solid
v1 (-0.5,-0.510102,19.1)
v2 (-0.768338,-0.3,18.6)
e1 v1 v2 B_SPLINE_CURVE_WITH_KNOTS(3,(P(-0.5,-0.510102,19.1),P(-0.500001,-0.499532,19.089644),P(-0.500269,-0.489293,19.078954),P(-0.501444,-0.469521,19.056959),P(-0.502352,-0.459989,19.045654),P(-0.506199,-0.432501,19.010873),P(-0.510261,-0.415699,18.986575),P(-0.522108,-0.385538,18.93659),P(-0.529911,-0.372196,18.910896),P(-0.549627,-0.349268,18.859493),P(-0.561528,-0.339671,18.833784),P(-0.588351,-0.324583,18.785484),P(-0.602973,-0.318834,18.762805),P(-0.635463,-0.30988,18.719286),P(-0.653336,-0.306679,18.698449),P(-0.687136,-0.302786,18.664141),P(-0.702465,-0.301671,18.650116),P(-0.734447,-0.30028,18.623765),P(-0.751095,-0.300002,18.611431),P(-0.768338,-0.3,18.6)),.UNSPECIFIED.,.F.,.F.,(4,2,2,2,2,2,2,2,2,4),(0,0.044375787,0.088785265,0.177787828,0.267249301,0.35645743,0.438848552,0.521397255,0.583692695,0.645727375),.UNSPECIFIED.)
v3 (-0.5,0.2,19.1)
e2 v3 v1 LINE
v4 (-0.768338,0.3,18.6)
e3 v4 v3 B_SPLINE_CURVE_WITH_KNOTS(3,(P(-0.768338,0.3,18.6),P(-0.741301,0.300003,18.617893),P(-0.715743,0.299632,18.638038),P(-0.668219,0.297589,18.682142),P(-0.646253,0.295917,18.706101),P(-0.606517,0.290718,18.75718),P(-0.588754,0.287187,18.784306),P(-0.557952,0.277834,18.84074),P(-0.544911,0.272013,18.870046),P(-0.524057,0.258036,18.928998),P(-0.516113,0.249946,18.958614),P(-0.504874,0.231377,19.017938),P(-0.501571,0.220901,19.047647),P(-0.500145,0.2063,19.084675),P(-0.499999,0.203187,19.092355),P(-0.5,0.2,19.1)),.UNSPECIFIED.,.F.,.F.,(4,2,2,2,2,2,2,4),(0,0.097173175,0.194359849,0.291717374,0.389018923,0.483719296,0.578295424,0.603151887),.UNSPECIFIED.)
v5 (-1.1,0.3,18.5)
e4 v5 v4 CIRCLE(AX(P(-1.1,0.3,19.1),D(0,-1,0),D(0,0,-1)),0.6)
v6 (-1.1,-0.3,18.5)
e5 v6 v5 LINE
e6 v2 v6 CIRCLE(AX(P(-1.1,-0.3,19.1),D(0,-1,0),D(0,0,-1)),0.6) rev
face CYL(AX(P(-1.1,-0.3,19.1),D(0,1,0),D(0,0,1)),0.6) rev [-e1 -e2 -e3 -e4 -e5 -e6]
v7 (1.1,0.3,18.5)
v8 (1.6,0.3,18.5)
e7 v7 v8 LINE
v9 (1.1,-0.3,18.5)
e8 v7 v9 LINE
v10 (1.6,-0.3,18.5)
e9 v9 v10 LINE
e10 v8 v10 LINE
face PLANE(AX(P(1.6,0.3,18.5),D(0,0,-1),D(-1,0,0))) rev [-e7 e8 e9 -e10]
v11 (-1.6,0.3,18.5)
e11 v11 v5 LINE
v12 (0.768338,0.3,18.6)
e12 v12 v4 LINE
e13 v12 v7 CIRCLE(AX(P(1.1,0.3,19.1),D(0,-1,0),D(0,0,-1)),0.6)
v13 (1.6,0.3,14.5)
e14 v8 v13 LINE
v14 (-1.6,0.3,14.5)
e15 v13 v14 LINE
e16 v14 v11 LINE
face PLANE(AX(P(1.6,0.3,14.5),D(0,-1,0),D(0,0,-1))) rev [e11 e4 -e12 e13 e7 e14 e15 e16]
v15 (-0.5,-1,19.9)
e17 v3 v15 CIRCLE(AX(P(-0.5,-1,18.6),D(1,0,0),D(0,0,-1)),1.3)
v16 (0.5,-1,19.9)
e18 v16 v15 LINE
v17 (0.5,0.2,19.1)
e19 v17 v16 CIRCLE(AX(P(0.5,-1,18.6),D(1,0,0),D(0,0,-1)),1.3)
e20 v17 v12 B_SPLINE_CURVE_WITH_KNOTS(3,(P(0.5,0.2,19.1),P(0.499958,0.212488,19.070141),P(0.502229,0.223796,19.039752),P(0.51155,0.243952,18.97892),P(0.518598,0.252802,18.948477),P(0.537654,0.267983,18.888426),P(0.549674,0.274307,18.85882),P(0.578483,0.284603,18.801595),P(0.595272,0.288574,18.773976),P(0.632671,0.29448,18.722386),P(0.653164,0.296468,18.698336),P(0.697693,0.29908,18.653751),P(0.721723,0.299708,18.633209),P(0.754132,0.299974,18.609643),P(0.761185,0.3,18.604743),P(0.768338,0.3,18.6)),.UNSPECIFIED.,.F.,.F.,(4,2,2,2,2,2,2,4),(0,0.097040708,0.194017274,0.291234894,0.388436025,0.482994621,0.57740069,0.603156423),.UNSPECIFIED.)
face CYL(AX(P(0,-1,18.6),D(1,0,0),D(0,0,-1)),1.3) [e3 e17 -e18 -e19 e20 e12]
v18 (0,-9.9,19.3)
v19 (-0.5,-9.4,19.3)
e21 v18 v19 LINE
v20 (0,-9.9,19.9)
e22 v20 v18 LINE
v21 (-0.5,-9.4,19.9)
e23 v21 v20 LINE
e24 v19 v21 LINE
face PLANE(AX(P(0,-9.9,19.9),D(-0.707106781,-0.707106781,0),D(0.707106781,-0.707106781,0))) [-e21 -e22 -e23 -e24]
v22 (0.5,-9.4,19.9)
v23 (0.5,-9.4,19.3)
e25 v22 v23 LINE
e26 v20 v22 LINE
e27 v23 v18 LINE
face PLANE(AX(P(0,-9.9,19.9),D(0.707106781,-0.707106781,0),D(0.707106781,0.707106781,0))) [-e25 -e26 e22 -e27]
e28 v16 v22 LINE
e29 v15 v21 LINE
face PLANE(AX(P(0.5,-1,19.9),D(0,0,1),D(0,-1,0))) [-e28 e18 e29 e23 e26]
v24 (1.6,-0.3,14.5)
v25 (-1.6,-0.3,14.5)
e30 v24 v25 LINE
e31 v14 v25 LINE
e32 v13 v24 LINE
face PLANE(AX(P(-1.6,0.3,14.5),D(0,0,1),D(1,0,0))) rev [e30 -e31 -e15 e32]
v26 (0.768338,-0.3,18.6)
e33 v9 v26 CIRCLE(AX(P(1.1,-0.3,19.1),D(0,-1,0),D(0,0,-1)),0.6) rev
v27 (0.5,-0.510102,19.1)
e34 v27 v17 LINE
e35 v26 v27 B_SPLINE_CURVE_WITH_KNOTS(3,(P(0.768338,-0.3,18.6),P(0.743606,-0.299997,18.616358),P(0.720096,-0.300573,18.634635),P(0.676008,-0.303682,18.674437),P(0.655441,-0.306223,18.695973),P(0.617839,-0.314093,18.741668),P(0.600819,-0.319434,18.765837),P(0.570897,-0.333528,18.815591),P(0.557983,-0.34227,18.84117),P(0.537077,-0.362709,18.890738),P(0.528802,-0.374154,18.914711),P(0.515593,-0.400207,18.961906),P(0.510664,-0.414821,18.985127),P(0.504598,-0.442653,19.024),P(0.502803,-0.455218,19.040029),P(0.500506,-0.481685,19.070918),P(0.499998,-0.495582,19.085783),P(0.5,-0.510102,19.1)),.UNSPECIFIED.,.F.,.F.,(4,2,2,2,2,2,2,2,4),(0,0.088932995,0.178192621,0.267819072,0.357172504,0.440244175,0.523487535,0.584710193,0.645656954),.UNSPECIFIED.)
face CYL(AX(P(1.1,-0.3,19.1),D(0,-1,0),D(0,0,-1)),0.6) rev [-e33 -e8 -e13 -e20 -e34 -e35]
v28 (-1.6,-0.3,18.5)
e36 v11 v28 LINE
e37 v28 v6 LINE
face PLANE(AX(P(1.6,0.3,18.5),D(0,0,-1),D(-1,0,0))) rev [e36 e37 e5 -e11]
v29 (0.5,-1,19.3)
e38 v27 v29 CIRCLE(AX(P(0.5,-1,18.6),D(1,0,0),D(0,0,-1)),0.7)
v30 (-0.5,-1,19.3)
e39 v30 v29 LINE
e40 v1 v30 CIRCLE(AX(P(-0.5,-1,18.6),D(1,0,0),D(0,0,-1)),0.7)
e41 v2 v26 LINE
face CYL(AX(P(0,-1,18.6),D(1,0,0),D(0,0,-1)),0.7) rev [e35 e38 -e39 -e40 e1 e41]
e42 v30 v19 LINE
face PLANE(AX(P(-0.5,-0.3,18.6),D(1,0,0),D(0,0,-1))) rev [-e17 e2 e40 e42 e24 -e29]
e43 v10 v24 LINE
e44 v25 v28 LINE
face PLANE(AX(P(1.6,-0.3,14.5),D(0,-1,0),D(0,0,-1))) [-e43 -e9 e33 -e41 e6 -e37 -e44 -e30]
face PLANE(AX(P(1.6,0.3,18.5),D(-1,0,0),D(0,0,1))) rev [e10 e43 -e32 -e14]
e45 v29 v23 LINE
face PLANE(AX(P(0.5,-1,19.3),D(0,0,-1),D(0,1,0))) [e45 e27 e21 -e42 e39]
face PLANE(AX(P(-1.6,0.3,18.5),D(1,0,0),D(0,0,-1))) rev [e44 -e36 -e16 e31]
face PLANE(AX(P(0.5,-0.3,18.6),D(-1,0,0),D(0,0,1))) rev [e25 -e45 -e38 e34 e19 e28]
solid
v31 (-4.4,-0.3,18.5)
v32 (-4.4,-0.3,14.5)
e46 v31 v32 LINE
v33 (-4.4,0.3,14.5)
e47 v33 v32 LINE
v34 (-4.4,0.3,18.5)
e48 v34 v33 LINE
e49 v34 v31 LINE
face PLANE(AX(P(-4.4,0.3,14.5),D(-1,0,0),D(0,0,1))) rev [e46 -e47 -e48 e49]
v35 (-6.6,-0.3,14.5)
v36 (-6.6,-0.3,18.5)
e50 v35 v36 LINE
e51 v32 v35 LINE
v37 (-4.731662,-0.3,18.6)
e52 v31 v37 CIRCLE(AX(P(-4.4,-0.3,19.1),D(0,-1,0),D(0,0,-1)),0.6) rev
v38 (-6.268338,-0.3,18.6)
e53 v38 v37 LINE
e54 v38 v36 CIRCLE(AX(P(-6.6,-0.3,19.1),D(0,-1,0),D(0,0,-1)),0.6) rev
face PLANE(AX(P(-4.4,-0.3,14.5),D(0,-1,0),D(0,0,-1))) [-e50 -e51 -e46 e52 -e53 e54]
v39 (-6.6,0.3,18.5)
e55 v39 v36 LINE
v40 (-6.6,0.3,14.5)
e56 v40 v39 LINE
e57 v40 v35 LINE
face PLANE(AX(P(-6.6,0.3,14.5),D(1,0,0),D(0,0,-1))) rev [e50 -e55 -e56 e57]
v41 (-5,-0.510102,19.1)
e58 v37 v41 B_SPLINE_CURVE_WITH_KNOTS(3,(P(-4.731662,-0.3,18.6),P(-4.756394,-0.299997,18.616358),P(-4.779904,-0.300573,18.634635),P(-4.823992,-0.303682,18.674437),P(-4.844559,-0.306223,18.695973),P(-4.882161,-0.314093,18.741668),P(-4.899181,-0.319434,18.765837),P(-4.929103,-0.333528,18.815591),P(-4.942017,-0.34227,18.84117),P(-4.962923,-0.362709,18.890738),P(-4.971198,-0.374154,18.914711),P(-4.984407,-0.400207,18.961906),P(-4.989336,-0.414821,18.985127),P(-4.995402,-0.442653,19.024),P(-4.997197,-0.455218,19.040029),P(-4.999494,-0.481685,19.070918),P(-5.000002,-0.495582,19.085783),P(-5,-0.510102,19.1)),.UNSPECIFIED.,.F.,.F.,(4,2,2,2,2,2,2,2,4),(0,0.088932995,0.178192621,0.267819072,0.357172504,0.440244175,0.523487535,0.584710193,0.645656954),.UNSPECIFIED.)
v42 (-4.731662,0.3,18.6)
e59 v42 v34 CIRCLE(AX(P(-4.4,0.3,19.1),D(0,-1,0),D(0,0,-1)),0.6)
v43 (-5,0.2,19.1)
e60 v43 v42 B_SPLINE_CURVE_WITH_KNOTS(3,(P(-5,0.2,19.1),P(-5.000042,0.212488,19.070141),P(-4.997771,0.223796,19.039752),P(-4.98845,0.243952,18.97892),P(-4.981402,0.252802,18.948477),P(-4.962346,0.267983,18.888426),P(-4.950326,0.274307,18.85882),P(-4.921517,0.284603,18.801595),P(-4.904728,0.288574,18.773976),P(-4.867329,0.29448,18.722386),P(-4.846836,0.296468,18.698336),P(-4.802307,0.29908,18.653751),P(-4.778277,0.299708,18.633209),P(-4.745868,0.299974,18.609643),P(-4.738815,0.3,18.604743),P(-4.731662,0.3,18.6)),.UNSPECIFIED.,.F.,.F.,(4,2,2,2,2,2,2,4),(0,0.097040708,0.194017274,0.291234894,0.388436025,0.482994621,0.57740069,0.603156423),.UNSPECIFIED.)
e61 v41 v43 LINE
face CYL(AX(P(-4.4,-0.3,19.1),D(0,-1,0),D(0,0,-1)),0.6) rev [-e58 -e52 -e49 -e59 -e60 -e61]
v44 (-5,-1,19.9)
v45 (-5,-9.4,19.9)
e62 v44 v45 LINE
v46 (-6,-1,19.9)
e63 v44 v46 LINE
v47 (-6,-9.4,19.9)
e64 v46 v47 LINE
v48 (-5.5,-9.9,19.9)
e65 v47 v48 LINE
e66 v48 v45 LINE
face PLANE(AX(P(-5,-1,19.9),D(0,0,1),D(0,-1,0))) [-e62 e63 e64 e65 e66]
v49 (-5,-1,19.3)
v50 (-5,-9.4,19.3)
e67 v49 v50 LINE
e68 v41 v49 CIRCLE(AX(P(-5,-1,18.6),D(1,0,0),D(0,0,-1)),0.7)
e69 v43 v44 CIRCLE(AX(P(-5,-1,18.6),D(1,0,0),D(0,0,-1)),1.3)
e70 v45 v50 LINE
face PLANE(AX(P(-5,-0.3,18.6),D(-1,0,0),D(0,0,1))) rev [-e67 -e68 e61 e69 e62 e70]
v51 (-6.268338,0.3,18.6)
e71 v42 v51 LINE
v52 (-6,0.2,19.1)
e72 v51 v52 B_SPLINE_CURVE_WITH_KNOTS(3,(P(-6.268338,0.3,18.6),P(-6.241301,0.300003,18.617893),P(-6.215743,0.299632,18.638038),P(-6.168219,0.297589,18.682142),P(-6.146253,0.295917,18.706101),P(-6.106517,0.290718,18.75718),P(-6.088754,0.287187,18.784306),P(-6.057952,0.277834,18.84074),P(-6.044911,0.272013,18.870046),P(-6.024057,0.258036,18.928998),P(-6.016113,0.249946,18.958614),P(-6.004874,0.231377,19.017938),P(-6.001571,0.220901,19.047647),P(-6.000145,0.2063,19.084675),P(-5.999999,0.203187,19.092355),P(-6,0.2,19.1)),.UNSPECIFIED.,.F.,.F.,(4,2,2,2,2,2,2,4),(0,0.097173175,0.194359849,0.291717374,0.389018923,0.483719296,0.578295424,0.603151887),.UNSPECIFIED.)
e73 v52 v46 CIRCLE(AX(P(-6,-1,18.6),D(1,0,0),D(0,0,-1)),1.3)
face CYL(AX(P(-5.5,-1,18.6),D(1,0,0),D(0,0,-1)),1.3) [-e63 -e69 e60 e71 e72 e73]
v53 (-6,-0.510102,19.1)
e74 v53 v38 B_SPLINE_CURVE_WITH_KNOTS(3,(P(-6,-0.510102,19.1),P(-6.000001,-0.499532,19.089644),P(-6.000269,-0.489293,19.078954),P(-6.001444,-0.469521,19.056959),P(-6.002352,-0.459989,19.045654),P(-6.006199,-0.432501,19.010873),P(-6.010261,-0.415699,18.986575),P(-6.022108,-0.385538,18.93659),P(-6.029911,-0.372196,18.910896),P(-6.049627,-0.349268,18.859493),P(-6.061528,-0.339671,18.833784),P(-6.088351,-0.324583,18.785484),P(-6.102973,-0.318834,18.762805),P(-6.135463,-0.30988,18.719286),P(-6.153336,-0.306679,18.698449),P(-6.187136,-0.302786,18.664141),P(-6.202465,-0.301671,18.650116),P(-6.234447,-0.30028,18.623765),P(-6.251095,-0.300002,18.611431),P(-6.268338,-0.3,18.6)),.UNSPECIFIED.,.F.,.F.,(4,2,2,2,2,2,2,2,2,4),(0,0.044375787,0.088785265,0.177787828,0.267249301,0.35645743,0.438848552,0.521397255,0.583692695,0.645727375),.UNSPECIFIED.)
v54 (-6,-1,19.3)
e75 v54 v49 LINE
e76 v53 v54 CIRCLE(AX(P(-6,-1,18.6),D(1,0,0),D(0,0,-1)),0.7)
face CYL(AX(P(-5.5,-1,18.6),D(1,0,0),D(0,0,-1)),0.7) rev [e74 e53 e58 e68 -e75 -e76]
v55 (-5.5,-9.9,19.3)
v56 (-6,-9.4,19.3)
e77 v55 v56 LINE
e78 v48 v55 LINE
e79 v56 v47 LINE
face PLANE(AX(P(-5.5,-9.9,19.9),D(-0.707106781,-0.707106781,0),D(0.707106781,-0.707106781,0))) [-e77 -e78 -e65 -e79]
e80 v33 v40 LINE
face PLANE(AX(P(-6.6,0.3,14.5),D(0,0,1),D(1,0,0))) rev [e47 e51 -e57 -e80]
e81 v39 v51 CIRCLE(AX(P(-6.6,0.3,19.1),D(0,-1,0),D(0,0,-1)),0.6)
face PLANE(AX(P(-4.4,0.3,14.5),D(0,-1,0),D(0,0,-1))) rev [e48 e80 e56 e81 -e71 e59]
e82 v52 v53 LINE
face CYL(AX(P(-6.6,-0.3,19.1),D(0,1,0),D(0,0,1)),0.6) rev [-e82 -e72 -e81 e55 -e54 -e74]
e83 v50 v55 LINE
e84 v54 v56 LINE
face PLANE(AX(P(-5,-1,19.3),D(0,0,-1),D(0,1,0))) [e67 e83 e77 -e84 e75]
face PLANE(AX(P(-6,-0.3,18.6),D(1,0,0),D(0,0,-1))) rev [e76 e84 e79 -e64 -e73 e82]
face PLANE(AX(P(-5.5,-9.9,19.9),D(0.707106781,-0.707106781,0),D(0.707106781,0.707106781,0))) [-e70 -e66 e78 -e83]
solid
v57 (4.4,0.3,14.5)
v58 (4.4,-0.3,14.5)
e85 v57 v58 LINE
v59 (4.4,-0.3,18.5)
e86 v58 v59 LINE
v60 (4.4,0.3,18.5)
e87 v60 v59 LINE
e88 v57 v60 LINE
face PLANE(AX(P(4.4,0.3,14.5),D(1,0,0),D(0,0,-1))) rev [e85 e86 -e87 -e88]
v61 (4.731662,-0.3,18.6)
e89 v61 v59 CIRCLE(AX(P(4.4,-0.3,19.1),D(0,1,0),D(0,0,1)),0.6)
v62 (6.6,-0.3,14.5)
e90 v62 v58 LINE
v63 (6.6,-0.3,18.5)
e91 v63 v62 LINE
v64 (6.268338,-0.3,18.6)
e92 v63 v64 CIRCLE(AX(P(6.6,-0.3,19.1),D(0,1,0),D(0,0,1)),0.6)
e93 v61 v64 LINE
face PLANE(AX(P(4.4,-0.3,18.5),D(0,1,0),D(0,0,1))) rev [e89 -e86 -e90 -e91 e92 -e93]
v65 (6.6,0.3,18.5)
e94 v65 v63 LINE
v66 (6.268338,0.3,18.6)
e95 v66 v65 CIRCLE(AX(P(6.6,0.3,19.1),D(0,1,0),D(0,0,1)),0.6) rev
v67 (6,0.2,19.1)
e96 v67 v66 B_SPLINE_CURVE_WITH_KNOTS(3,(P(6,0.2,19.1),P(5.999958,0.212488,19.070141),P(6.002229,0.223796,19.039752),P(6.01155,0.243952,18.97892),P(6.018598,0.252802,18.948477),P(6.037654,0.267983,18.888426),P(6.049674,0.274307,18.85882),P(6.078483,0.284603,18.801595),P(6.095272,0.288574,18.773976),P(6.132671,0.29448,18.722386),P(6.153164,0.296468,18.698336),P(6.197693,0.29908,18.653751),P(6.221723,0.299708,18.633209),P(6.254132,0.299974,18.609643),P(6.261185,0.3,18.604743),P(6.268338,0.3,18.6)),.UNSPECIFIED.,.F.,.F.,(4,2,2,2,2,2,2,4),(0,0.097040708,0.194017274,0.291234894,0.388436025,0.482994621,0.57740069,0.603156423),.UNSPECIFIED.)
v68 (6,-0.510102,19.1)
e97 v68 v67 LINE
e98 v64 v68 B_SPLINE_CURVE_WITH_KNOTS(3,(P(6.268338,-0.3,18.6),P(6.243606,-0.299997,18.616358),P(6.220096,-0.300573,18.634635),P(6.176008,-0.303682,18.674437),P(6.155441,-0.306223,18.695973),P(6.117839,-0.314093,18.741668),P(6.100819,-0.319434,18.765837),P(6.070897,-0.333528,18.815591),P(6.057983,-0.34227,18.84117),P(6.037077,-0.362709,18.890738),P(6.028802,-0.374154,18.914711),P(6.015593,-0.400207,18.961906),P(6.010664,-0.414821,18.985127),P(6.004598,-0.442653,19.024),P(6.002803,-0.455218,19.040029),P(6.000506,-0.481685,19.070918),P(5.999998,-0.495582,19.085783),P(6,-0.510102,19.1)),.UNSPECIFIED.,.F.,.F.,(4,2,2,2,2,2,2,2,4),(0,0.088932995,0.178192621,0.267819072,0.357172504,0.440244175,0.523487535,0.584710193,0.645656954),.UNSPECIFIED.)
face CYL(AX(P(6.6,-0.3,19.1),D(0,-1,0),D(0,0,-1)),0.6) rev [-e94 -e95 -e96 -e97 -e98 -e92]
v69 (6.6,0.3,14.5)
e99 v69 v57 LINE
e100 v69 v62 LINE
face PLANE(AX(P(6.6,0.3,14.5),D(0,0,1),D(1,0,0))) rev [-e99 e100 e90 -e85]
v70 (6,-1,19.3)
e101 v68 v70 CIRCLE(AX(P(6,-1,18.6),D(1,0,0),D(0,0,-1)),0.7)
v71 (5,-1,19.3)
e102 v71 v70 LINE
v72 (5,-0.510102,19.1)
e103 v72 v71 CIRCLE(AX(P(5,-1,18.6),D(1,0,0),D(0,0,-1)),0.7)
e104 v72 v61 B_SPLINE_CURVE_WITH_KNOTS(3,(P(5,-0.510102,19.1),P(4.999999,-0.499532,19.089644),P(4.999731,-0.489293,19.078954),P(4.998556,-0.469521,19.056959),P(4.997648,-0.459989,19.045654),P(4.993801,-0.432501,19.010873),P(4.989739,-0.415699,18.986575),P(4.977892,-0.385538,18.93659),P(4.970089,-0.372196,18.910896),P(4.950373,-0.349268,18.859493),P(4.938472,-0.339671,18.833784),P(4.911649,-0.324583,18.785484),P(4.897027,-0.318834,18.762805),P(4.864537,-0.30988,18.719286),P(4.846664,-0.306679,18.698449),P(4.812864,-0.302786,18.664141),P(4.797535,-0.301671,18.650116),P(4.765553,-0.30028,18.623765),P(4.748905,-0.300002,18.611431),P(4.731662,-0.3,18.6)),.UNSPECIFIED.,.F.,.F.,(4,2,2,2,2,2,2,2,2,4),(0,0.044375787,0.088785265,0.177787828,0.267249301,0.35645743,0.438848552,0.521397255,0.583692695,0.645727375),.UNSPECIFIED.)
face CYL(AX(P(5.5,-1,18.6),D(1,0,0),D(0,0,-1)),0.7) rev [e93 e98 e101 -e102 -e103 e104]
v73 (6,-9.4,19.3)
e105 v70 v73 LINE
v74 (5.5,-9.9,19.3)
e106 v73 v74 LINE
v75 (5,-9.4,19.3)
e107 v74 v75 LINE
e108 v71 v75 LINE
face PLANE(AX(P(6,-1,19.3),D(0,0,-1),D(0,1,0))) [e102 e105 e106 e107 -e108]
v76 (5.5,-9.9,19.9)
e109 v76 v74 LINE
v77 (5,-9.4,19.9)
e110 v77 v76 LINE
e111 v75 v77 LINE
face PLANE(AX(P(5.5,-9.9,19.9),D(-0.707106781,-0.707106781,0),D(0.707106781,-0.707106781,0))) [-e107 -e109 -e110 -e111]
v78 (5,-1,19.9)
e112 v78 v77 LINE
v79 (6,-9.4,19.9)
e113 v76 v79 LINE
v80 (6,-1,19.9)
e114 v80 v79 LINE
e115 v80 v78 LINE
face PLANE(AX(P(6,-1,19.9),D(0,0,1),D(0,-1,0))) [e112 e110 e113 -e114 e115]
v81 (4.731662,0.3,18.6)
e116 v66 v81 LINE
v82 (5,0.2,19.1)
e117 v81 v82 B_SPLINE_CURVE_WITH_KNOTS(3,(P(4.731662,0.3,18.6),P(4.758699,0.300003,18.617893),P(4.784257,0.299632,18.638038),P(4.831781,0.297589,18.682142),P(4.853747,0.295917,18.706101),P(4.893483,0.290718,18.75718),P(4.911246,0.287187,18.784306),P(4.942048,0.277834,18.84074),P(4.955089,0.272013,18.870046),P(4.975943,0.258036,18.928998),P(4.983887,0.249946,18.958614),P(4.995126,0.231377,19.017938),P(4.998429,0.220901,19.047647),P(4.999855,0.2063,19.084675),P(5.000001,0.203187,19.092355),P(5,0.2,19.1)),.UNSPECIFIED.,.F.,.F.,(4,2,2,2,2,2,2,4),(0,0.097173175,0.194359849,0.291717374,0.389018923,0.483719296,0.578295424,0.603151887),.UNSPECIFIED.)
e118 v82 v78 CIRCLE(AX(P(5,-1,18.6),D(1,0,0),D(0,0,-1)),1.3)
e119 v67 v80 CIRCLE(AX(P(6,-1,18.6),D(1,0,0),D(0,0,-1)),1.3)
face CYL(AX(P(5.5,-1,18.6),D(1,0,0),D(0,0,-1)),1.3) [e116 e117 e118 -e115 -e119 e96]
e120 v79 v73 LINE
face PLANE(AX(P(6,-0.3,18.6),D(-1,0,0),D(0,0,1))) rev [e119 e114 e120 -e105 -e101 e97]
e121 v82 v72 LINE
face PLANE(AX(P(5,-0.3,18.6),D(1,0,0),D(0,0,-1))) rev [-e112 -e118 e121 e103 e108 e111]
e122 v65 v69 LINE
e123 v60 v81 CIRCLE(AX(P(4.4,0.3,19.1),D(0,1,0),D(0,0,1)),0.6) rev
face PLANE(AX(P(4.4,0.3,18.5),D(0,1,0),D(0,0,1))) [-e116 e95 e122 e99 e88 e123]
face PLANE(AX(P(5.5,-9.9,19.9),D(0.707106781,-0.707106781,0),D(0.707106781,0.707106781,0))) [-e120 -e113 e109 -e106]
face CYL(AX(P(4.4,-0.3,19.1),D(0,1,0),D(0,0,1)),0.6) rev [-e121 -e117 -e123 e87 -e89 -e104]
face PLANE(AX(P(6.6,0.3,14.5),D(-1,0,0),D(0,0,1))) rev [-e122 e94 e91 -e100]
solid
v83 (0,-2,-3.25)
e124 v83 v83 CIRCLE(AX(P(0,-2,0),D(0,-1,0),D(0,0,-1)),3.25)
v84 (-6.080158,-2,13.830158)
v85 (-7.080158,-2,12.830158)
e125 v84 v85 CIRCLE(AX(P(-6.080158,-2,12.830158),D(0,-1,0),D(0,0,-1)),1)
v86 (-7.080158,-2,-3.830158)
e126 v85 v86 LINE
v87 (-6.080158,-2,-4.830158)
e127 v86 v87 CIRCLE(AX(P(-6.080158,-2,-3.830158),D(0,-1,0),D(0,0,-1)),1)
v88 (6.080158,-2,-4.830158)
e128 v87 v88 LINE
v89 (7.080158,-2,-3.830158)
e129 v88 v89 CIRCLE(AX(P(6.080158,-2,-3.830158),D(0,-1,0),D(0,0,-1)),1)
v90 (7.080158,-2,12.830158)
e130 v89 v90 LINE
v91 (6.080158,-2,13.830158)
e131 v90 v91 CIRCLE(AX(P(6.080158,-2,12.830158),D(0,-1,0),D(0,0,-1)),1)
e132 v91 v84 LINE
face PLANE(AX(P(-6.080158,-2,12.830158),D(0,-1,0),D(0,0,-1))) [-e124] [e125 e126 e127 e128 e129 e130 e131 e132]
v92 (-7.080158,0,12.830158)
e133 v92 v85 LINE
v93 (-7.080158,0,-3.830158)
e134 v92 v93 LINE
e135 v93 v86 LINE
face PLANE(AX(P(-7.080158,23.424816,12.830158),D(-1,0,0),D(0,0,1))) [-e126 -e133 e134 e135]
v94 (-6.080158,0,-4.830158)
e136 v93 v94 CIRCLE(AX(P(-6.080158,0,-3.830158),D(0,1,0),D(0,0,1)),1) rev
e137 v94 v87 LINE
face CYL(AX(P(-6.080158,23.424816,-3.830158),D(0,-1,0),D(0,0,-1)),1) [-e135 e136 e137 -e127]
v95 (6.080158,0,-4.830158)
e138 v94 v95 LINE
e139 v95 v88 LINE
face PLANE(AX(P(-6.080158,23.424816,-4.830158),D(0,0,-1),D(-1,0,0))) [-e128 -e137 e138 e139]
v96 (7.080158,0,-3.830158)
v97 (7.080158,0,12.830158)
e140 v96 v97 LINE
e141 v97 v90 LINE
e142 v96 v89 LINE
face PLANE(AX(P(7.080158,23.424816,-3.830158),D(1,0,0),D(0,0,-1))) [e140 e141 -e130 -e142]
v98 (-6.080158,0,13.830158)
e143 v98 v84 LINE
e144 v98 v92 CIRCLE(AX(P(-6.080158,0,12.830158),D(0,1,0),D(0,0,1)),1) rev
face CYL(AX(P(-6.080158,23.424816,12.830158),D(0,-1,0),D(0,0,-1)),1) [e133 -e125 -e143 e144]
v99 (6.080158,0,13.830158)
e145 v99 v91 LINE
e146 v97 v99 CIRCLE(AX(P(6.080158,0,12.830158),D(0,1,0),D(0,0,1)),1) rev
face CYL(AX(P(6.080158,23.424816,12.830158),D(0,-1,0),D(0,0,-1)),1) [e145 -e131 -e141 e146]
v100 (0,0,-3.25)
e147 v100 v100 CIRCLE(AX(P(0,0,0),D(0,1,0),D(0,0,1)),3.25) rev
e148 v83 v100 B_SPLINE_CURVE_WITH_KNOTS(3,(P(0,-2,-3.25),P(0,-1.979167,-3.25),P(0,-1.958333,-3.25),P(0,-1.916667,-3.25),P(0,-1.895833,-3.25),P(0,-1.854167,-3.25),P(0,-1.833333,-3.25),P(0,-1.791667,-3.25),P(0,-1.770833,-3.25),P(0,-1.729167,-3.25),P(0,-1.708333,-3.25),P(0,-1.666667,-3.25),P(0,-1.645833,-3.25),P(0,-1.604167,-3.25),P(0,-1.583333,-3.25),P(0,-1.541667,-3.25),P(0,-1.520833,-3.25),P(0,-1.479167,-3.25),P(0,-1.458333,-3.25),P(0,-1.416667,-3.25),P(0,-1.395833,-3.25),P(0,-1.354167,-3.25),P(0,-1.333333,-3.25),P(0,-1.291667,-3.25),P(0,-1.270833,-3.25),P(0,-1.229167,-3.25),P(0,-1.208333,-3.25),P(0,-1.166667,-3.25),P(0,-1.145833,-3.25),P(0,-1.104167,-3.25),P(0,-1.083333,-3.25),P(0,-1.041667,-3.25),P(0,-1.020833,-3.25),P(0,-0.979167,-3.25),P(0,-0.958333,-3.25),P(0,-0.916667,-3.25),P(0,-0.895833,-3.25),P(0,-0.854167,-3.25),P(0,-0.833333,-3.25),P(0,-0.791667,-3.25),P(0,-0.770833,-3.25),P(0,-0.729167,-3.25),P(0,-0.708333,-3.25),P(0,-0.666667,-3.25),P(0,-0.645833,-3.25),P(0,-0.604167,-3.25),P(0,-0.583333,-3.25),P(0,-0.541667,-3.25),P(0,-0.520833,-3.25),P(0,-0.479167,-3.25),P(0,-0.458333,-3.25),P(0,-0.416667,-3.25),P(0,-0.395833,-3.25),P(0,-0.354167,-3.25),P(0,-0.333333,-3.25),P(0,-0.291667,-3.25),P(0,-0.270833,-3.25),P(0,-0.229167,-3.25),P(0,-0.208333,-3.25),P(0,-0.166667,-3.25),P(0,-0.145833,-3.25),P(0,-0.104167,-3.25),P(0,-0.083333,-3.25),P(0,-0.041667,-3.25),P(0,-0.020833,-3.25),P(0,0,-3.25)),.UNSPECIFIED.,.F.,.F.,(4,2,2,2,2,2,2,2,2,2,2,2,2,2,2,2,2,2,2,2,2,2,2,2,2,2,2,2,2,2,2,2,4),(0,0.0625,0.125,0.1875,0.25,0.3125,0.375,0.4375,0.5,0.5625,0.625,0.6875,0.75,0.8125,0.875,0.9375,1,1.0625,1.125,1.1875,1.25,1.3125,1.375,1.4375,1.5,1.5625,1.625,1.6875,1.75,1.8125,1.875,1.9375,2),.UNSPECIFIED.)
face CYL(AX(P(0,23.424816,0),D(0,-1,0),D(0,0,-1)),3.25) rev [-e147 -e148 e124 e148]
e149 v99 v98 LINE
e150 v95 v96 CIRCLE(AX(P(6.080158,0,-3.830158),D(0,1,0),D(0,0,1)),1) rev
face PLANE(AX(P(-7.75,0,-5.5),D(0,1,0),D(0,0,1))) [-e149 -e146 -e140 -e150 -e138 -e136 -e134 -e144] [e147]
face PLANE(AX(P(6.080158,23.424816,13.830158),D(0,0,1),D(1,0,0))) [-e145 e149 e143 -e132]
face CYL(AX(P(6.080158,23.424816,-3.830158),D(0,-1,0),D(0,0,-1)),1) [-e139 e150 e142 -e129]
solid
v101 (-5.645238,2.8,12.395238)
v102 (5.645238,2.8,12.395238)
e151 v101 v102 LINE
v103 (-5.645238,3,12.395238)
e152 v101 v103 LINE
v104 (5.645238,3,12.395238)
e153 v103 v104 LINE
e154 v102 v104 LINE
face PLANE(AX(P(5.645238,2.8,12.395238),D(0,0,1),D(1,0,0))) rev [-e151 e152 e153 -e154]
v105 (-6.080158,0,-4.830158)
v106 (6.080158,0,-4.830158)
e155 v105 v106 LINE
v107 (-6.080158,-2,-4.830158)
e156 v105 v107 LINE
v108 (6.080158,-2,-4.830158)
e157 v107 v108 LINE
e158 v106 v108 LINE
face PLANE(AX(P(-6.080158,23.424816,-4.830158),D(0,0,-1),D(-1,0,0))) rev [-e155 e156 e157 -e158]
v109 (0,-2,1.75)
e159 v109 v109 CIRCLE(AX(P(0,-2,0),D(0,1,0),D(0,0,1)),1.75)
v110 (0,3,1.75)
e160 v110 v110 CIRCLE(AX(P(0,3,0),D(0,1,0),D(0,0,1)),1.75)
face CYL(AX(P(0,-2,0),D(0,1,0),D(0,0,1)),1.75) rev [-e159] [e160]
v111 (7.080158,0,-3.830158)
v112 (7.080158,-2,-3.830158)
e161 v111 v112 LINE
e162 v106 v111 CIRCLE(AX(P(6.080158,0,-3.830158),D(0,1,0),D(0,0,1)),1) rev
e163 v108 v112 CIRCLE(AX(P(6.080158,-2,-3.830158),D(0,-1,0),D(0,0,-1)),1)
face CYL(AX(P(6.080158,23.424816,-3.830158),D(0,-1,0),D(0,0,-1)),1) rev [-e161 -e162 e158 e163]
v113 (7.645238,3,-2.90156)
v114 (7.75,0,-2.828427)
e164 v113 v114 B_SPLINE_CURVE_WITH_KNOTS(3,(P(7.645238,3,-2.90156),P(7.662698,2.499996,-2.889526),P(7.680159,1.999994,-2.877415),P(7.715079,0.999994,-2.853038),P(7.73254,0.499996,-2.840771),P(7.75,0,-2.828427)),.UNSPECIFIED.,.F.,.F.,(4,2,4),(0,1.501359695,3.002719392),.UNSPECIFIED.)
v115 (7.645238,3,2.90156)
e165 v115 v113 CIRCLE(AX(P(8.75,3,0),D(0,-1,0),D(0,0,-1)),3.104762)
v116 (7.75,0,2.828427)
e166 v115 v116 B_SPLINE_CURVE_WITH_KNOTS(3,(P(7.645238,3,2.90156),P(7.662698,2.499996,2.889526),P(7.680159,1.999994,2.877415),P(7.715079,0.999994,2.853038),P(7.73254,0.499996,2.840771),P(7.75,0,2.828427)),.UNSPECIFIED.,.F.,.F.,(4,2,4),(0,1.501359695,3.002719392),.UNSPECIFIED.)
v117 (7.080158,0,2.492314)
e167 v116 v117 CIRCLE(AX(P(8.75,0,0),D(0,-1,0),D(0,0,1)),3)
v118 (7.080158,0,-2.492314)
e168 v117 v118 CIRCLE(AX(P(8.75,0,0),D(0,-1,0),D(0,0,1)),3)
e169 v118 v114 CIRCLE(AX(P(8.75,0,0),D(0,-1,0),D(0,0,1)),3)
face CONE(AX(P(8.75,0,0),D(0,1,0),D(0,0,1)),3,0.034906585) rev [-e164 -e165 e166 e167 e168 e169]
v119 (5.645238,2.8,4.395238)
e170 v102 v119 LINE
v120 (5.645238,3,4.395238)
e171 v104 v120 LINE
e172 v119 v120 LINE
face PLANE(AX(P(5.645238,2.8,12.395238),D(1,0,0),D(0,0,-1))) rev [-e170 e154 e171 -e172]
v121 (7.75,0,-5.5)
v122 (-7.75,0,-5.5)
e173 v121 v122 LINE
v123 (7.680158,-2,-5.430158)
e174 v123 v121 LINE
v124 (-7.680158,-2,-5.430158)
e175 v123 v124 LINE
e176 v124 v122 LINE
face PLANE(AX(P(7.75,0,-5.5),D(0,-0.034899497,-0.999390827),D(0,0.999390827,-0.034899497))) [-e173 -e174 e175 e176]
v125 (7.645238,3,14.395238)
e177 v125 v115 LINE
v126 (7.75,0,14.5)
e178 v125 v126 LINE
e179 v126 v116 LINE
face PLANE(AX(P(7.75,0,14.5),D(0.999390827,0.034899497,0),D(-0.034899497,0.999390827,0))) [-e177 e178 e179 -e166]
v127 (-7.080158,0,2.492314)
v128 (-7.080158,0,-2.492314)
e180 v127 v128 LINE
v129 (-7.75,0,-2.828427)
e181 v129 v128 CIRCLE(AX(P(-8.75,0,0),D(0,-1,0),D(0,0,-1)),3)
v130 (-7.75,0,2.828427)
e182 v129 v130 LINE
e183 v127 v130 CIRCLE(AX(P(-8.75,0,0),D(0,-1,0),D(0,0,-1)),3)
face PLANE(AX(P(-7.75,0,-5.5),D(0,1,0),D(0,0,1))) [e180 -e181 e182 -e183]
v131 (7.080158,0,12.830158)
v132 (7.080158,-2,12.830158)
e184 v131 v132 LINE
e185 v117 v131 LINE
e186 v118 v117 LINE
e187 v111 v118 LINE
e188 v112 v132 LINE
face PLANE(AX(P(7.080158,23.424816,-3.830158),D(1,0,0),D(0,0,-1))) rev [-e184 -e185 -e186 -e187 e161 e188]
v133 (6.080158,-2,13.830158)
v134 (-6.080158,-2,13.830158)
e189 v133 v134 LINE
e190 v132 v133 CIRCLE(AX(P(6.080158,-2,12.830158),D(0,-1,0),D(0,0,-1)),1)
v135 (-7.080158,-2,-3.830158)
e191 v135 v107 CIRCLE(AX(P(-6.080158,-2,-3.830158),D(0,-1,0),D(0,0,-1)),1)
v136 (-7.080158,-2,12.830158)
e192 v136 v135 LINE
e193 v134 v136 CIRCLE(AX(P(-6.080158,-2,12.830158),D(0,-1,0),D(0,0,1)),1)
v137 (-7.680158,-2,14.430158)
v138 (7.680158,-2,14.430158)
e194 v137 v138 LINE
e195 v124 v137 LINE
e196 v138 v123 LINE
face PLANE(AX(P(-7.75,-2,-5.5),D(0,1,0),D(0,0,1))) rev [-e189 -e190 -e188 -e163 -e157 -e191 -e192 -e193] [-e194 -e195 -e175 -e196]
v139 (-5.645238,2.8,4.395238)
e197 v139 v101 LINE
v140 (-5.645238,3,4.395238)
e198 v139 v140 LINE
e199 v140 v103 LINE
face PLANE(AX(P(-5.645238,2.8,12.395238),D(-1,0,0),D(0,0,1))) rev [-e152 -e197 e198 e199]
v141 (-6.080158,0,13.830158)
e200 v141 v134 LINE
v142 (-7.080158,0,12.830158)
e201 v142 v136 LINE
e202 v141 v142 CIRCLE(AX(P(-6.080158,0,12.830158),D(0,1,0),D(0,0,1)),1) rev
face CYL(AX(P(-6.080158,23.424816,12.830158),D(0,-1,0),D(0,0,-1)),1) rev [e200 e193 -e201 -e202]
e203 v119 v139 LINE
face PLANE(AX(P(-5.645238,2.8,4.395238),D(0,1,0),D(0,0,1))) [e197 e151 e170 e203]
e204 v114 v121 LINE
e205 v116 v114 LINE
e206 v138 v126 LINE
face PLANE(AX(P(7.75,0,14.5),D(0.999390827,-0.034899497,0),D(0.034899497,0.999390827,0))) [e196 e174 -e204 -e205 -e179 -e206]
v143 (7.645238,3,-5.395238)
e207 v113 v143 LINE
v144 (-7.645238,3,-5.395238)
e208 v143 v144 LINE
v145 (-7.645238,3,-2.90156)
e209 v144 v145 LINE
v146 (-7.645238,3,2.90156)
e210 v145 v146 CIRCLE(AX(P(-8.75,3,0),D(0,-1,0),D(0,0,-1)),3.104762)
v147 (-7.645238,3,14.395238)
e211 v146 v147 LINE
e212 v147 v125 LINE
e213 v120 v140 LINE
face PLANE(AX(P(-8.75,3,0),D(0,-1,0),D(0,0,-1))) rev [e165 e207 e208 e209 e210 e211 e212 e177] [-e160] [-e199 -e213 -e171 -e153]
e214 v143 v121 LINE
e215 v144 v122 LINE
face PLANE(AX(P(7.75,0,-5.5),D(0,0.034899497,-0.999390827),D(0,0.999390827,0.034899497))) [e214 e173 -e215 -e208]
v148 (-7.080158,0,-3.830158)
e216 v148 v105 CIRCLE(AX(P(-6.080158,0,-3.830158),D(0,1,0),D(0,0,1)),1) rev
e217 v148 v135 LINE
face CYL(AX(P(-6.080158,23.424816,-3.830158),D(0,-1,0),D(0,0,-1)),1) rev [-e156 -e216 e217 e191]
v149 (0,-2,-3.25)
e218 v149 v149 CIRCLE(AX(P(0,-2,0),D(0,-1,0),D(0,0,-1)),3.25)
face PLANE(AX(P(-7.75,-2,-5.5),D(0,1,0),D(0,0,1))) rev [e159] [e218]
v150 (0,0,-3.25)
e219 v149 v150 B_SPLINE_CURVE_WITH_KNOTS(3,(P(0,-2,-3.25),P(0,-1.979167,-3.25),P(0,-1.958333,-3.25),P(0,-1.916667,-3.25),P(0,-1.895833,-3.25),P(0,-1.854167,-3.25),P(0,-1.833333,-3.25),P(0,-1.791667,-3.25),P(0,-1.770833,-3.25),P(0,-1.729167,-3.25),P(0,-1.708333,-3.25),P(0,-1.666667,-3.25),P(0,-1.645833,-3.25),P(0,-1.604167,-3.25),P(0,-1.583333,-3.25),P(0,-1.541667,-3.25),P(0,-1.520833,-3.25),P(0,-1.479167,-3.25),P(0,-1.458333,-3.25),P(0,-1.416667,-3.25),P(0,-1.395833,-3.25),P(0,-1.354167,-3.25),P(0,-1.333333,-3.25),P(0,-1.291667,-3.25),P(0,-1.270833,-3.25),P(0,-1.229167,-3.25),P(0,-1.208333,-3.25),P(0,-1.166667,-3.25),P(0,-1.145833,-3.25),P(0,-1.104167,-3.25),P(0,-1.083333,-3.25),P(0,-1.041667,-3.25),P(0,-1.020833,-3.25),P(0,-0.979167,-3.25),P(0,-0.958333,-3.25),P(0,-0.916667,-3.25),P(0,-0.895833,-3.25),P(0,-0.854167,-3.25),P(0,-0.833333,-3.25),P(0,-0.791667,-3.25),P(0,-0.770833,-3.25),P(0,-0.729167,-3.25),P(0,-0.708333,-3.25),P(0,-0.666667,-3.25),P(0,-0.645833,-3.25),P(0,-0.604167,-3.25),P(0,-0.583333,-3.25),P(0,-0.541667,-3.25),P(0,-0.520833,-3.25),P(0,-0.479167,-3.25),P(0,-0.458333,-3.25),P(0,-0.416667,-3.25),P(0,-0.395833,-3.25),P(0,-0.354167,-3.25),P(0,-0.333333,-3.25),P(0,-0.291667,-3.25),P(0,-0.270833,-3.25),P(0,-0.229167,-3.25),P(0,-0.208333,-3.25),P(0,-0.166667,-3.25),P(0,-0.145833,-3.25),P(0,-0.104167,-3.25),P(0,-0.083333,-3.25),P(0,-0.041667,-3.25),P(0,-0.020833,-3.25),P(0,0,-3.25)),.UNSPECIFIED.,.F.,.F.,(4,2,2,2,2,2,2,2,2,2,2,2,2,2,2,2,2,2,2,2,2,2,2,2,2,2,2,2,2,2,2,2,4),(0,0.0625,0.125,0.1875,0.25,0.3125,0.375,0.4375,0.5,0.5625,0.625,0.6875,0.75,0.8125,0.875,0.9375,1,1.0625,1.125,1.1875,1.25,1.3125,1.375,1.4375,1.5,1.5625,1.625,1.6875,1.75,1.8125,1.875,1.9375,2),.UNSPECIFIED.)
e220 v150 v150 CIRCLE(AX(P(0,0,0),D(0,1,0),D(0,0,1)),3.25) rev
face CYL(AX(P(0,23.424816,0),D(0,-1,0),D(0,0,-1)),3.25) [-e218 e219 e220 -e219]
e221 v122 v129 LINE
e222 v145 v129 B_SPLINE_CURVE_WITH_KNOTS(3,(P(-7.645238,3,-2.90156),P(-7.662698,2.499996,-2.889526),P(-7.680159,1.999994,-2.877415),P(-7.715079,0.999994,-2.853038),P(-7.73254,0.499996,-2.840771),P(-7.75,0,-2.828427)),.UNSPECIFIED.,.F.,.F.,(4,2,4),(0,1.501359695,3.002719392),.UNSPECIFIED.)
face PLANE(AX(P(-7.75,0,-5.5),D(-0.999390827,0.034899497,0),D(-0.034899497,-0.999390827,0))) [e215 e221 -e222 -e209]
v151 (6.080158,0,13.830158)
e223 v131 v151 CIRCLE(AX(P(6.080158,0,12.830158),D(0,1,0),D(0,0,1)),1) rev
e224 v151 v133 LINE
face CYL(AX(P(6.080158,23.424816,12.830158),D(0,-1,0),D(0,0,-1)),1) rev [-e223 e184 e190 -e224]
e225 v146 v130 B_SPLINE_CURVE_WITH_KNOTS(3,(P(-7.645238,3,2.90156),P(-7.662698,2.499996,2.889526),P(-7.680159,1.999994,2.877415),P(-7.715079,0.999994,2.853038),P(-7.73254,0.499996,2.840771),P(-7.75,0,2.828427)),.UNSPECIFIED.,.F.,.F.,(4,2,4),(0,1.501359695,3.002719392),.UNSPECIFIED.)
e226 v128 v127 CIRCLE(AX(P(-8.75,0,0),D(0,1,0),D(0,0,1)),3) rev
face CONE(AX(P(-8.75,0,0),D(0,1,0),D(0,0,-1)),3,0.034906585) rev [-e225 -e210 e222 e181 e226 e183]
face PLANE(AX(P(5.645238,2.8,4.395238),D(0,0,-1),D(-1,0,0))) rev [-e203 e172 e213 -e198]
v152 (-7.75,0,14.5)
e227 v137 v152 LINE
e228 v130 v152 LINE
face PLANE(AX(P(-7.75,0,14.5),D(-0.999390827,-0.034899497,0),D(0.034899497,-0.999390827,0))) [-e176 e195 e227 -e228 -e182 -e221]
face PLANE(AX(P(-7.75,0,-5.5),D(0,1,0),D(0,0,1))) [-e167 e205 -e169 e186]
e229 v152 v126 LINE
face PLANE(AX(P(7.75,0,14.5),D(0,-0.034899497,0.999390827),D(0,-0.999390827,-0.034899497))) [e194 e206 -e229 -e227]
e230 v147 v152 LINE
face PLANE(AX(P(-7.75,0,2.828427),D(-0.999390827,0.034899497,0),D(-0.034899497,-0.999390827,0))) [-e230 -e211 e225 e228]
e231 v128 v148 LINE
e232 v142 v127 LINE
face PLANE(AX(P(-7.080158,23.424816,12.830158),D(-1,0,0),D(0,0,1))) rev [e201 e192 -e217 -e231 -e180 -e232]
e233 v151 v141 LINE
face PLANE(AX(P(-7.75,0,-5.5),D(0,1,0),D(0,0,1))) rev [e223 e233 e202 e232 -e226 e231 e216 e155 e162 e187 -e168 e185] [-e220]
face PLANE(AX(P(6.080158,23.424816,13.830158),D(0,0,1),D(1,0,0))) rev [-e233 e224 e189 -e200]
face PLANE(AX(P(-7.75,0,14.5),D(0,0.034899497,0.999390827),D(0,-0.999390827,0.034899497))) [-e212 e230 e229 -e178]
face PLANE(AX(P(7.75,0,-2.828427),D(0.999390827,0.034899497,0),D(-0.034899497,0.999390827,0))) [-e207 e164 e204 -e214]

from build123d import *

# Parameters (mm, degrees)
SKETCH1_W             = 15.5
SKETCH1_H             = 20
EXTRUDE1_DEPTH        = 2
EXTRUDE1_DRAFT        = -2
EXTRUDE2_DEPTH        = 3
EXTRUDE2_TAPER        = 2
SKETCH3_R             = 1.75
EXTRUDE3_DEPTH        = 18.184658986
SKETCH4_W             = 2.2
SKETCH4_H             = 4
EXTRUDE4_DEPTH        = 0.3
SKETCH4_W_2           = 3.2
EXTRUDE4_2_DEPTH      = 0.3
EXTRUDE4_3_DEPTH      = 0.3
SKETCH5_W             = 11.290475384
SKETCH5_H             = 8
EXTRUDE5_DEPTH        = 0.2
SKETCH6_W             = 1
SKETCH6_H             = 0.6
CHAMFER1_SIZE         = 0.5
LPATTERN1_START       = 18.6
LPATTERN1_DEPTH       = 1.3
LPATTERN1_START_2     = 18.5
LPATTERN1_2_OUTLINE_W = 1
LPATTERN1_2_OUTLINE_H = 0.6
LPATTERN1_2_DEPTH     = 0.8
LPATTERN1_START_3     = 5
LPATTERN1_3_DEPTH     = 1
LPATTERN1_4_DEPTH     = 1.3
LPATTERN1_5_OUTLINE_W = 1
LPATTERN1_5_OUTLINE_H = 0.6
LPATTERN1_5_DEPTH     = 0.8
LPATTERN1_START_4     = -0.5
LPATTERN1_6_DEPTH     = 1
FILLET1_START         = -0.510102151
FILLET1_DEPTH         = 0.810102151
FILLET1_START_2       = -8
FILLET1_2_DEPTH       = 5
FILLET2_START         = -0.510102151
FILLET2_DEPTH         = 0.810102151
FILLET2_START_2       = -2
FILLET2_2_DEPTH       = 4
FILLET3_START         = -0.510102151
FILLET3_DEPTH         = 0.810102151
FILLET3_START_2       = 3
FILLET3_2_DEPTH       = 5
SKETCH7_R             = 3.25
CUT_EXTRUDE1_DEPTH    = 2
SKETCH8_R             = 3.25
EXTRUDE7_DEPTH        = 2


with BuildPart() as part:
    # Sketch1 → Extrude1 (with draft: the straight prism first)
    with BuildSketch(Plane(origin=(0, 0, 0), x_dir=(1, 0, 0), z_dir=(0, 1, 0))):
        with Locations((0, -4.5)):
            Rectangle(SKETCH1_W, SKETCH1_H)
    extrude(amount=-EXTRUDE1_DEPTH)
    # Extrude1: the draft: its side faces are tilted about the plane it starts from
    extrude1_sides = [part.faces().sort_by_distance(p)[0] for p in [
        (7.75, -1, 4.5),
        (0, -1, -5.5),
        (-7.75, -1, 4.5),
        (0, -1, 14.5),
    ]]
    draft(extrude1_sides, Plane(origin=(0, 0, 0), x_dir=(1, 0, 0), z_dir=(0, 1, 0)), EXTRUDE1_DRAFT)

    # Sketch2 → Extrude2 (add)
    with BuildSketch(Plane(origin=(0, 0, 0), x_dir=(1, 0, 0), z_dir=(0, 1, 0))):
        with BuildLine():
            Line((-7.75, -2.828427125), (-7.75, -14.5))
            Line((-7.75, -14.5), (7.75, -14.5))
            Line((7.75, -14.5), (7.75, -2.828427125))
            ThreePointArc((7.75, -2.828427125), (5.75, 0), (7.75, 2.828427125))
            Line((7.75, 2.828427125), (7.75, 5.5))
            Line((7.75, 5.5), (-7.75, 5.5))
            Line((-7.75, 5.5), (-7.75, 2.828427125))
            ThreePointArc((-7.75, 2.828427125), (-5.75, 0), (-7.75, -2.828427125))
        make_face()
    extrude(amount=EXTRUDE2_DEPTH, taper=EXTRUDE2_TAPER)

    # Sketch3 → Extrude3 (cut, through all)
    with BuildSketch(Plane(origin=(0, 3, 0), x_dir=(1, 0, 0), z_dir=(0, 1, 0))):
        with Locations(Location((0, 0, 0), (0, 0, 270))):
            Circle(SKETCH3_R)
    extrude(amount=-EXTRUDE3_DEPTH, mode=Mode.SUBTRACT)

    # Sketch5 → Extrude5 (cut)
    with BuildSketch(Plane(origin=(0, 3, 0), x_dir=(1, 0, 0), z_dir=(0, 1, 0))):
        with Locations((0, -8.395237692)):
            Rectangle(SKETCH5_W, SKETCH5_H)
    extrude(amount=-EXTRUDE5_DEPTH, mode=Mode.SUBTRACT)

    # Sketch7 → Cut-Extrude1 (cut)
    with BuildSketch(Plane.XZ.offset(2)):
        with BuildLine():
            Line((-7.080158461, 12.830158461), (-7.080158461, -3.830158461))
            ThreePointArc((-7.080158461, -3.830158461), (-6.787265242, -4.537265242), (-6.080158461, -4.830158461))
            Line((-6.080158461, -4.830158461), (6.080158461, -4.830158461))
            ThreePointArc((6.080158461, -4.830158461), (6.787265242, -4.537265242), (7.080158461, -3.830158461))
            Line((7.080158461, -3.830158461), (7.080158461, 12.830158461))
            ThreePointArc((7.080158461, 12.830158461), (6.787265242, 13.537265242), (6.080158461, 13.830158461))
            Line((6.080158461, 13.830158461), (-6.080158461, 13.830158461))
            ThreePointArc((-6.080158461, 13.830158461), (-6.787265242, 13.537265242), (-7.080158461, 12.830158461))
        make_face()
        with Locations(Location((0, 0, 0), (0, 0, 270))):
            Circle(SKETCH7_R, mode=Mode.SUBTRACT)
    extrude(amount=-CUT_EXTRUDE1_DEPTH, mode=Mode.SUBTRACT)


with BuildPart() as body_2:
    # Sketch4 → Extrude4 (new, symmetric)
    with BuildSketch(Plane(origin=(0, 0, 0), x_dir=(1, 0, 0), z_dir=(0, 1, 0))):
        with Locations((-5.5, -16.5)):
            Rectangle(SKETCH4_W, SKETCH4_H)
    extrude(amount=EXTRUDE4_DEPTH, both=True)

    # Sweep1: sweep along a curve in space
    with BuildLine() as sweep1_path:
        Line((-5.5, 0, 18.5), (-5.5, 0, 18.6))
        ThreePointArc((-5.5, -1, 19.6), (-5.5, -0.292893219, 19.307106781), (-5.5, 0, 18.6))
        Line((-5.5, -9.9, 19.6), (-5.5, -1, 19.6))
    # Sketch6 → Sweep1 (sweep)
    with BuildSketch(Plane.XY.offset(18.5)):
        with Locations((-5.5, 0)):
            Rectangle(SKETCH6_W, SKETCH6_H)
    sweep(path=sweep1_path.line)

    # Chamfer1
    chamfer1_edges = [body_2.edges().sort_by_distance(p)[0] for p in [
        (-6, -9.9, 19.6),
        (-5, -9.9, 19.6),
    ]]
    chamfer(chamfer1_edges, length=CHAMFER1_SIZE - 0.0001)  # a hair under: the kernel refuses the full size

    # Fillet1: read off the stored shape, not the designer's step
    # Fillet1 outline → Fillet1 (add)
    with BuildSketch(Plane(origin=(0, 0, 0), x_dir=(1, 0, 0), z_dir=(0, 1, 0)).offset(FILLET1_START)):
        with BuildLine():
            Line((-5, -18.5), (-5, -19.1))
            ThreePointArc((-5, -19.1), (-4.824264069, -18.675735931), (-4.4, -18.5))
            Line((-4.4, -18.5), (-5, -18.5))
        make_face()
        with BuildLine():
            ThreePointArc((-6.6, -18.5), (-6.175735931, -18.675735931), (-6, -19.1))
            Line((-6, -19.1), (-6, -18.5))
            Line((-6, -18.5), (-6.6, -18.5))
        make_face()
    extrude(amount=FILLET1_DEPTH)

    # Fillet1 2 outline → Fillet1 2 (cut)
    with BuildSketch(Plane.YZ.offset(FILLET1_START_2)):
        with BuildLine():
            Line((-0.510102102, 19.10000005), (-0.510102151, 18.5))
            Line((-0.510102151, 18.5), (-0.3, 18.5))
            Line((-0.3, 18.5), (-0.3, 18.6))
            ThreePointArc((-0.3, 18.6), (-0.354659575, 18.871174733), (-0.510102102, 19.10000005))
        make_face()
        with BuildLine():
            Line((0.3, 19.1), (0.2, 19.1))
            ThreePointArc((0.2, 19.1), (0.274754878, 18.854950976), (0.3, 18.6))
            Line((0.3, 18.6), (0.3, 19.1))
        make_face()
    extrude(amount=FILLET1_2_DEPTH, mode=Mode.SUBTRACT)


with BuildPart() as body_3:
    # Sketch4 → Extrude4 2 (new, symmetric)
    with BuildSketch(Plane(origin=(0, 0, 0), x_dir=(1, 0, 0), z_dir=(0, 1, 0))):
        with Locations((0, -16.5)):
            Rectangle(SKETCH4_W_2, SKETCH4_H)
    extrude(amount=EXTRUDE4_2_DEPTH, both=True)

    # LPattern1 4 outline → LPattern1 4 (add)
    with BuildSketch(Plane.XY.offset(LPATTERN1_START)):
        Polygon((-0.5, -9.4), (0, -9.9), (0.5, -9.4), (0.5, 0.3), (-0.5, 0.3), align=None)
    extrude(amount=LPATTERN1_4_DEPTH)

    # LPattern1 5 outline → LPattern1 5 (add)
    with BuildSketch(Plane.XY.offset(LPATTERN1_START_2)):
        Rectangle(LPATTERN1_5_OUTLINE_W, LPATTERN1_5_OUTLINE_H)
    extrude(amount=LPATTERN1_5_DEPTH)

    # LPattern1 6 outline → LPattern1 6 (cut)
    with BuildSketch(Plane.YZ.offset(LPATTERN1_START_4)):
        with BuildLine():
            Line((-1, 19.3), (-11, 19.3))
            Line((-11, 19.3), (-11, 18.6))
            Line((-11, 18.6), (-0.3, 18.6))
            ThreePointArc((-0.3, 18.6), (-0.505025253, 19.094974747), (-1, 19.3))
        make_face()
        with BuildLine():
            Line((0.3, 19.9), (-1, 19.9))
            ThreePointArc((-1, 19.9), (-0.080761184, 19.519238816), (0.3, 18.6))
            Line((0.3, 18.6), (0.3, 19.9))
        make_face()
    extrude(amount=LPATTERN1_6_DEPTH, mode=Mode.SUBTRACT)

    # Fillet2: read off the stored shape, not the designer's step
    # Fillet2 outline → Fillet2 (add)
    with BuildSketch(Plane(origin=(0, 0, 0), x_dir=(1, 0, 0), z_dir=(0, 1, 0)).offset(FILLET2_START)):
        with BuildLine():
            ThreePointArc((-1.1, -18.5), (-0.675735931, -18.675735931), (-0.5, -19.1))
            Line((-0.5, -19.1), (-0.5, -18.5))
            Line((-0.5, -18.5), (-1.1, -18.5))
        make_face()
        with BuildLine():
            Line((0.5, -18.5), (0.5, -19.1))
            ThreePointArc((0.5, -19.1), (0.675735931, -18.675735931), (1.1, -18.5))
            Line((1.1, -18.5), (0.5, -18.5))
        make_face()
    extrude(amount=FILLET2_DEPTH)

    # Fillet2 2 outline → Fillet2 2 (cut)
    with BuildSketch(Plane.YZ.offset(FILLET2_START_2)):
        with BuildLine():
            Line((-0.510102102, 19.10000005), (-0.510102151, 18.5))
            Line((-0.510102151, 18.5), (-0.3, 18.5))
            Line((-0.3, 18.5), (-0.3, 18.6))
            ThreePointArc((-0.3, 18.6), (-0.354659575, 18.871174733), (-0.510102102, 19.10000005))
        make_face()
        with BuildLine():
            Line((0.3, 19.1), (0.2, 19.1))
            ThreePointArc((0.2, 19.1), (0.274754878, 18.854950976), (0.3, 18.6))
            Line((0.3, 18.6), (0.3, 19.1))
        make_face()
    extrude(amount=FILLET2_2_DEPTH, mode=Mode.SUBTRACT)


with BuildPart() as body_4:
    # Sketch4 → Extrude4 3 (new, symmetric)
    with BuildSketch(Plane(origin=(0, 0, 0), x_dir=(1, 0, 0), z_dir=(0, 1, 0))):
        with Locations((5.5, -16.5)):
            Rectangle(SKETCH4_W, SKETCH4_H)
    extrude(amount=EXTRUDE4_3_DEPTH, both=True)

    # LPattern1: read off the stored shape, not the designer's step
    # LPattern1 outline → LPattern1 (add)
    with BuildSketch(Plane.XY.offset(LPATTERN1_START)):
        Polygon((5, -9.4), (5.5, -9.9), (6, -9.4), (6, 0.3), (5, 0.3), align=None)
    extrude(amount=LPATTERN1_DEPTH)

    # LPattern1 2 outline → LPattern1 2 (add)
    with BuildSketch(Plane.XY.offset(LPATTERN1_START_2)):
        with Locations((5.5, 0)):
            Rectangle(LPATTERN1_2_OUTLINE_W, LPATTERN1_2_OUTLINE_H)
    extrude(amount=LPATTERN1_2_DEPTH)

    # LPattern1 3 outline → LPattern1 3 (cut)
    with BuildSketch(Plane.YZ.offset(LPATTERN1_START_3)):
        with BuildLine():
            Line((-1, 19.3), (-11, 19.3))
            Line((-11, 19.3), (-11, 18.6))
            Line((-11, 18.6), (-0.3, 18.6))
            ThreePointArc((-0.3, 18.6), (-0.505025253, 19.094974747), (-1, 19.3))
        make_face()
        with BuildLine():
            Line((0.3, 19.9), (-1, 19.9))
            ThreePointArc((-1, 19.9), (-0.080761184, 19.519238816), (0.3, 18.6))
            Line((0.3, 18.6), (0.3, 19.9))
        make_face()
    extrude(amount=LPATTERN1_3_DEPTH, mode=Mode.SUBTRACT)

    # Fillet3: read off the stored shape, not the designer's step
    # Fillet3 outline → Fillet3 (add)
    with BuildSketch(Plane(origin=(0, 0, 0), x_dir=(1, 0, 0), z_dir=(0, 1, 0)).offset(FILLET3_START)):
        with BuildLine():
            ThreePointArc((4.4, -18.5), (4.824264069, -18.675735931), (5, -19.1))
            Line((5, -19.1), (5, -18.5))
            Line((5, -18.5), (4.4, -18.5))
        make_face()
        with BuildLine():
            Line((6, -18.5), (6, -19.1))
            ThreePointArc((6, -19.1), (6.175735931, -18.675735931), (6.6, -18.5))
            Line((6.6, -18.5), (6, -18.5))
        make_face()
    extrude(amount=FILLET3_DEPTH)

    # Fillet3 2 outline → Fillet3 2 (cut)
    with BuildSketch(Plane.YZ.offset(FILLET3_START_2)):
        with BuildLine():
            Line((-0.510102102, 19.10000005), (-0.510102151, 18.5))
            Line((-0.510102151, 18.5), (-0.3, 18.5))
            Line((-0.3, 18.5), (-0.3, 18.6))
            ThreePointArc((-0.3, 18.6), (-0.354659575, 18.871174733), (-0.510102102, 19.10000005))
        make_face()
        with BuildLine():
            Line((0.3, 19.1), (0.2, 19.1))
            ThreePointArc((0.2, 19.1), (0.274754878, 18.854950976), (0.3, 18.6))
            Line((0.3, 18.6), (0.3, 19.1))
        make_face()
    extrude(amount=FILLET3_2_DEPTH, mode=Mode.SUBTRACT)


with BuildPart() as body_5:
    # Sketch8 → Extrude7 (new body)
    with BuildSketch(Plane.XZ.offset(2)):
        with BuildLine():
            Line((-7.080158461, 12.830158461), (-7.080158461, -3.830158461))
            ThreePointArc((-7.080158461, -3.830158461), (-6.787265242, -4.537265242), (-6.080158461, -4.830158461))
            Line((-6.080158461, -4.830158461), (6.080158461, -4.830158461))
            ThreePointArc((6.080158461, -4.830158461), (6.787265242, -4.537265242), (7.080158461, -3.830158461))
            Line((7.080158461, -3.830158461), (7.080158461, 12.830158461))
            ThreePointArc((7.080158461, 12.830158461), (6.787265242, 13.537265242), (6.080158461, 13.830158461))
            Line((6.080158461, 13.830158461), (-6.080158461, 13.830158461))
            ThreePointArc((-6.080158461, 13.830158461), (-6.787265242, 13.537265242), (-7.080158461, 12.830158461))
        make_face()
        with Locations(Location((0, 0, 0), (0, 0, 270))):
            Circle(SKETCH8_R, mode=Mode.SUBTRACT)
    extrude(amount=-EXTRUDE7_DEPTH)


solid = Compound([part.part, body_2.part, body_3.part, body_4.part, body_5.part])
